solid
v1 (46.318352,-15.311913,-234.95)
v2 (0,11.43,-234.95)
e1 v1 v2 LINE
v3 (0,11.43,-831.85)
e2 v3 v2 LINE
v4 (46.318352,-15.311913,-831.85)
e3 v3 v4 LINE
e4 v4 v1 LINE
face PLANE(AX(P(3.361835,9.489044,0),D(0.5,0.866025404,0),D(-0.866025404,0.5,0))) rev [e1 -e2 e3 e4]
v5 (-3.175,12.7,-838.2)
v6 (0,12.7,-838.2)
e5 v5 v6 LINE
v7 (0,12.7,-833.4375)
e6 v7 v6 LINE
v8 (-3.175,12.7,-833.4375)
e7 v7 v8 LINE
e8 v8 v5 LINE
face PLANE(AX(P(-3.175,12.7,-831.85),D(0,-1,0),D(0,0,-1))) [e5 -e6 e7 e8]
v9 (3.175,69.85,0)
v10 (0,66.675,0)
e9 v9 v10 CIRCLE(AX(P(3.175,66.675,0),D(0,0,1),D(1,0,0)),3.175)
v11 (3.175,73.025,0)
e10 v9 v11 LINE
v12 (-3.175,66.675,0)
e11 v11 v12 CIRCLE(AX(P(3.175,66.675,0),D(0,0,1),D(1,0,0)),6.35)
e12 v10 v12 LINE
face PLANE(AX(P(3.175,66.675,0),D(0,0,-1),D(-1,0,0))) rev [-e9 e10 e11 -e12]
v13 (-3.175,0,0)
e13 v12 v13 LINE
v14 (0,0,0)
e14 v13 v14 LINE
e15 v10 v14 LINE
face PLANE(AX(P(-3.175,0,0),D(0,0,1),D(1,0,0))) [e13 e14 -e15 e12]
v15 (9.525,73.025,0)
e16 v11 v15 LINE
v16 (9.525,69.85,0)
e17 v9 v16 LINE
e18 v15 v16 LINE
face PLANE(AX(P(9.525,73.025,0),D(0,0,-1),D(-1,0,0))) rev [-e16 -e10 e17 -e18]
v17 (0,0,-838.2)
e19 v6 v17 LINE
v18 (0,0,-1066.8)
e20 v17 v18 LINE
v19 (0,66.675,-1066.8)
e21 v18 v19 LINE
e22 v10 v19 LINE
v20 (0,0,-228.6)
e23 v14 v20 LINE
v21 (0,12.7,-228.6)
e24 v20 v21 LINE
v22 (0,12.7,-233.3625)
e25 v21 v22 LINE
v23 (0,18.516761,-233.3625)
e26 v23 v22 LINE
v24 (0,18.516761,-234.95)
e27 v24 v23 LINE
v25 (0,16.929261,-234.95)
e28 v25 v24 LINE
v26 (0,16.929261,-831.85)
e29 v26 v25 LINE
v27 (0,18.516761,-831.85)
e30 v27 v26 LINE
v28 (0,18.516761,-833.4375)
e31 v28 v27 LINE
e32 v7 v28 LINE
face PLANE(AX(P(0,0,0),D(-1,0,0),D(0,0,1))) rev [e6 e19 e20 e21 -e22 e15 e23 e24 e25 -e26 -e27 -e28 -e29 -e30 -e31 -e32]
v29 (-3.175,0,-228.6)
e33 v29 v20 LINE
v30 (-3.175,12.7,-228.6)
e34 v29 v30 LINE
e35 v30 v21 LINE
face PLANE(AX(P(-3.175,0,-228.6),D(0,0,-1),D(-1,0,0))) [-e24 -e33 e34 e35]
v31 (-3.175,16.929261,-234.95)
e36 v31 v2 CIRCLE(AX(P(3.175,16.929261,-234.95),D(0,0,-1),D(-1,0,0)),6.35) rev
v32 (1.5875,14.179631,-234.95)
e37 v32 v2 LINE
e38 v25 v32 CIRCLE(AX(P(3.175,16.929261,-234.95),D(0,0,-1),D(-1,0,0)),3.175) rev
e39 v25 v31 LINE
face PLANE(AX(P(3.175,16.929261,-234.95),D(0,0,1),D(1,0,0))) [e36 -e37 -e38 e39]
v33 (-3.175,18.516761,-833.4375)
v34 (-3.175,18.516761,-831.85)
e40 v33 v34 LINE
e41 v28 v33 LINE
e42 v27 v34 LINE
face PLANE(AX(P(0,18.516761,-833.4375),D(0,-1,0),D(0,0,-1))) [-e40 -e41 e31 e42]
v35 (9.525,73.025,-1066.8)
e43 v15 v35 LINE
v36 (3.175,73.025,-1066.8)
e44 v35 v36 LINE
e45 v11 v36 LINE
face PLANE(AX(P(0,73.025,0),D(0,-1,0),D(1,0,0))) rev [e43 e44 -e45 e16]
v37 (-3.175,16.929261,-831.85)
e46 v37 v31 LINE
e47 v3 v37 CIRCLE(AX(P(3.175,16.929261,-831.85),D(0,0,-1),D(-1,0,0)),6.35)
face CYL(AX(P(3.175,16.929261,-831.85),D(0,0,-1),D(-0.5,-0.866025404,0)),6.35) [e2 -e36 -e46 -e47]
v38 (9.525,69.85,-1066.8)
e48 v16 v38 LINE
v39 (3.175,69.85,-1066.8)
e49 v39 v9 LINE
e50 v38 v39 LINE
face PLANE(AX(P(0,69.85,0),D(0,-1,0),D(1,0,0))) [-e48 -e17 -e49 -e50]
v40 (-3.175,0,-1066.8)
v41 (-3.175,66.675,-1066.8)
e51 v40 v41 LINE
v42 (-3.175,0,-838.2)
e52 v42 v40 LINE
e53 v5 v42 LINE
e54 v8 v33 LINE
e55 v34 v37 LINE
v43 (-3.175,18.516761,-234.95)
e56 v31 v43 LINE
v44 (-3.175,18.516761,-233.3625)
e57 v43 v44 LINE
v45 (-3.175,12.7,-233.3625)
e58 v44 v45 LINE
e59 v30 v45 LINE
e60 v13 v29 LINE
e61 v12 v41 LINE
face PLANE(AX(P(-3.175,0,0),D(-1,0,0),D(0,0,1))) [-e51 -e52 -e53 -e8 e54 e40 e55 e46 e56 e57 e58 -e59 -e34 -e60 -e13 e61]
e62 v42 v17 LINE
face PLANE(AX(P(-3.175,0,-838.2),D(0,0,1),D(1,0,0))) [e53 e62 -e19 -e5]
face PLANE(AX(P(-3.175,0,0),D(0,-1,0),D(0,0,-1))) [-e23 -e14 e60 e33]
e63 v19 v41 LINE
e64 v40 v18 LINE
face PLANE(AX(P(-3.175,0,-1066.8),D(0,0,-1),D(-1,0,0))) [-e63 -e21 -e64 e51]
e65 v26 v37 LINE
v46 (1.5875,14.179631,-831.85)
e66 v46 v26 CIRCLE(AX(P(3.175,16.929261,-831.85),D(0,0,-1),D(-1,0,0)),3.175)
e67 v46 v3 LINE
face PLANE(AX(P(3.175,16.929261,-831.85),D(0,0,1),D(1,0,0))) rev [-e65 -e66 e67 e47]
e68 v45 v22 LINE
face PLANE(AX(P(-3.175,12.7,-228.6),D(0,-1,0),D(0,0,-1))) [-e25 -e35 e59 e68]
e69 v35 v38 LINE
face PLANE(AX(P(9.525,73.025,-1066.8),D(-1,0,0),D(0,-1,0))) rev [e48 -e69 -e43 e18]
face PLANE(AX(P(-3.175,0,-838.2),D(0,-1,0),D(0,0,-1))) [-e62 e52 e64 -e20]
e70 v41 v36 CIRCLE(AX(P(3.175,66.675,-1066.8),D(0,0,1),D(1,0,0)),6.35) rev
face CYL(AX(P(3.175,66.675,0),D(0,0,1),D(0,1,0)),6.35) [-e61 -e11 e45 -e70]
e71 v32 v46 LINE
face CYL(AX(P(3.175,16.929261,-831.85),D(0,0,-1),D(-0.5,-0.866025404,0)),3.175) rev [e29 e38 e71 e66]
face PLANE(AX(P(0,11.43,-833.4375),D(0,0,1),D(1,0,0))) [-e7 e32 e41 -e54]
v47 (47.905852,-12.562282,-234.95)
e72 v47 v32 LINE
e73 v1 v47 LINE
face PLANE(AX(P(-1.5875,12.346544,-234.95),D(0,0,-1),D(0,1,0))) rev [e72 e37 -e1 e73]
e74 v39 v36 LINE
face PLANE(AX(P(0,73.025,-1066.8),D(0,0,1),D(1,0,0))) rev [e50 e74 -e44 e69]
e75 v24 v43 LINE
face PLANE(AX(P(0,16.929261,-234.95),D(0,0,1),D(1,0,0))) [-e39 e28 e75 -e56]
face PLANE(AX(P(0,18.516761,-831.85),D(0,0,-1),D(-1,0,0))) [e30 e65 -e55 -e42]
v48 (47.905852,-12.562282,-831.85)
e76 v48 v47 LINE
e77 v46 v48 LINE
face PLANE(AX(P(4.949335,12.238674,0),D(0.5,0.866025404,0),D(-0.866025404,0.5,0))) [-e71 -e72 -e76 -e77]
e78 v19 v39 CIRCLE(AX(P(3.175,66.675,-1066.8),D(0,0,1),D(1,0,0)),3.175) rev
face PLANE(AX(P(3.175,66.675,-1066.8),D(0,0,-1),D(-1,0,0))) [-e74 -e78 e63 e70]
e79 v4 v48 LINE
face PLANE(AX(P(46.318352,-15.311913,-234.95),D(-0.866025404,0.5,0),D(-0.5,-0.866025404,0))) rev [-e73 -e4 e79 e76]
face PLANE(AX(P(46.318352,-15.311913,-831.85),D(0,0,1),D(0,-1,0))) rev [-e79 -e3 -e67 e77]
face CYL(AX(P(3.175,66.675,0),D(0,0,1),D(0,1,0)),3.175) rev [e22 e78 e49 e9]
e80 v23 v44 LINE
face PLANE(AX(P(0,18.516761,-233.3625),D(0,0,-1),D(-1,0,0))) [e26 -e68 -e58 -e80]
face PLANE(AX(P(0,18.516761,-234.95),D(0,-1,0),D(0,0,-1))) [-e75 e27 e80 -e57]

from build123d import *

# Parameters (mm, degrees)
BASE_FLANGE1_DEPTH           = 3.175
EDGE_FLANGE1_START           = -833.4375
EDGE_FLANGE1_DEPTH           = 600.075
EDGE_FLANGE1_2_DEPTH         = 1.5875
EDGE_FLANGE1_START_2         = -234.95
EDGE_FLANGE1_3_DEPTH         = 1.5875
EDGE_FLANGE1_START_3         = -831.85
EDGE_FLANGE1_4_DEPTH         = 596.9
EDGE_FLANGE2_STRIP_W         = 19.05
EDGE_FLANGE2_STRIP_H         = 3.175
EDGE_FLANGE2_STRIP_CUT_DEPTH = 1066.8
EDGE_FLANGE2_DEPTH           = 1066.8


# Read off the part's stored shape, not the designer's step: Edge-Flange1
# Sheet-metal steps are written as plain solids
with BuildPart() as part:
    # Sketch1 → Base-Flange1 (new body)
    with BuildSketch(Plane(origin=(0, 0, 0), x_dir=(0, 0, -1), z_dir=(1, 0, 0))):
        Polygon((838.2, 0), (1066.8, 0), (1066.8, 73.025), (0, 73.025), (0, 0), (228.6, 0), (228.6, 12.7), (234.95, 12.7), (234.95, 11.43), (831.85, 11.43), (831.85, 12.7), (838.2, 12.7), align=None)
    extrude(amount=-BASE_FLANGE1_DEPTH)

    # Edge-Flange1 outline → Edge-Flange1 (cut)
    with BuildSketch(Plane.XY.offset(EDGE_FLANGE1_START)):
        with BuildLine():
            Line((-3.175, 16.929261314), (-3.175, 11.43))
            Line((-3.175, 11.43), (0, 11.43))
            ThreePointArc((0, 11.43), (-2.324261314, 13.754261314), (-3.175, 16.929261314))
        make_face()
    extrude(amount=EDGE_FLANGE1_DEPTH, mode=Mode.SUBTRACT)

    # Edge-Flange1 2 outline → Edge-Flange1 2 (cut)
    with BuildSketch(Plane.XY.offset(EDGE_FLANGE1_START)):
        with BuildLine():
            Line((0, 18.516761314), (-3.175, 18.516761314))
            Line((-3.175, 18.516761314), (-3.175, 16.929261314))
            ThreePointArc((-3.175, 16.929261314), (-2.757968249, 14.665992052), (-1.561649527, 12.7))
            Line((-1.561649527, 12.7), (0, 12.7))
            Line((0, 12.7), (0, 18.516761314))
        make_face()
    extrude(amount=EDGE_FLANGE1_2_DEPTH, mode=Mode.SUBTRACT)

    # Edge-Flange1 3 outline → Edge-Flange1 3 (cut)
    with BuildSketch(Plane.XY.offset(EDGE_FLANGE1_START_2)):
        with BuildLine():
            Line((0, 18.516761314), (-3.175, 18.516761314))
            Line((-3.175, 18.516761314), (-3.175, 16.929261314))
            ThreePointArc((-3.175, 16.929261314), (-2.757968249, 14.665992052), (-1.561649527, 12.7))
            Line((-1.561649527, 12.7), (0, 12.7))
            Line((0, 12.7), (0, 18.516761314))
        make_face()
    extrude(amount=EDGE_FLANGE1_3_DEPTH, mode=Mode.SUBTRACT)

    # Edge-Flange1 4 outline → Edge-Flange1 4 (add)
    with BuildSketch(Plane.XY.offset(EDGE_FLANGE1_START_3)):
        with BuildLine():
            ThreePointArc((1.5875, 14.179630657), (0.425369343, 15.341761314), (0, 16.929261314))
            Line((0, 16.929261314), (0, 11.43))
            Line((0, 11.43), (46.318351826, -15.311912895))
            Line((46.318351826, -15.311912895), (47.905851826, -12.562282238))
            Line((47.905851826, -12.562282238), (1.5875, 14.179630657))
        make_face()
    extrude(amount=EDGE_FLANGE1_4_DEPTH)

    # Edge-Flange2 strip (across the edge) → Edge-Flange2 strip cut (cut)
    with BuildSketch(Plane(origin=(0, 73.025, -1066.8), x_dir=(0, -1, 0), z_dir=(0, 0, 1))):
        with Locations((-3.175, -1.5875)):
            Rectangle(EDGE_FLANGE2_STRIP_W, EDGE_FLANGE2_STRIP_H)
    extrude(amount=EDGE_FLANGE2_STRIP_CUT_DEPTH, mode=Mode.SUBTRACT)

    # Edge-Flange2 section (across the edge) → Edge-Flange2 (add)
    with BuildSketch(Plane(origin=(0, 73.025, -1066.8), x_dir=(0, -1, 0), z_dir=(0, 0, 1))):
        with BuildLine():
            Line((0, 3.175), (0, 9.525))
            Line((0, 9.525), (3.175, 9.525))
            Line((3.175, 9.525), (3.175, 3.175))
            ThreePointArc((3.175, 3.175), (4.10493597, 0.92993597), (6.35, 0))
            Line((6.35, 0), (6.35, -3.175))
            ThreePointArc((6.35, -3.175), (1.859871939, -1.315128061), (0, 3.175))
        make_face()
    extrude(amount=EDGE_FLANGE2_DEPTH)


solid = part.part
